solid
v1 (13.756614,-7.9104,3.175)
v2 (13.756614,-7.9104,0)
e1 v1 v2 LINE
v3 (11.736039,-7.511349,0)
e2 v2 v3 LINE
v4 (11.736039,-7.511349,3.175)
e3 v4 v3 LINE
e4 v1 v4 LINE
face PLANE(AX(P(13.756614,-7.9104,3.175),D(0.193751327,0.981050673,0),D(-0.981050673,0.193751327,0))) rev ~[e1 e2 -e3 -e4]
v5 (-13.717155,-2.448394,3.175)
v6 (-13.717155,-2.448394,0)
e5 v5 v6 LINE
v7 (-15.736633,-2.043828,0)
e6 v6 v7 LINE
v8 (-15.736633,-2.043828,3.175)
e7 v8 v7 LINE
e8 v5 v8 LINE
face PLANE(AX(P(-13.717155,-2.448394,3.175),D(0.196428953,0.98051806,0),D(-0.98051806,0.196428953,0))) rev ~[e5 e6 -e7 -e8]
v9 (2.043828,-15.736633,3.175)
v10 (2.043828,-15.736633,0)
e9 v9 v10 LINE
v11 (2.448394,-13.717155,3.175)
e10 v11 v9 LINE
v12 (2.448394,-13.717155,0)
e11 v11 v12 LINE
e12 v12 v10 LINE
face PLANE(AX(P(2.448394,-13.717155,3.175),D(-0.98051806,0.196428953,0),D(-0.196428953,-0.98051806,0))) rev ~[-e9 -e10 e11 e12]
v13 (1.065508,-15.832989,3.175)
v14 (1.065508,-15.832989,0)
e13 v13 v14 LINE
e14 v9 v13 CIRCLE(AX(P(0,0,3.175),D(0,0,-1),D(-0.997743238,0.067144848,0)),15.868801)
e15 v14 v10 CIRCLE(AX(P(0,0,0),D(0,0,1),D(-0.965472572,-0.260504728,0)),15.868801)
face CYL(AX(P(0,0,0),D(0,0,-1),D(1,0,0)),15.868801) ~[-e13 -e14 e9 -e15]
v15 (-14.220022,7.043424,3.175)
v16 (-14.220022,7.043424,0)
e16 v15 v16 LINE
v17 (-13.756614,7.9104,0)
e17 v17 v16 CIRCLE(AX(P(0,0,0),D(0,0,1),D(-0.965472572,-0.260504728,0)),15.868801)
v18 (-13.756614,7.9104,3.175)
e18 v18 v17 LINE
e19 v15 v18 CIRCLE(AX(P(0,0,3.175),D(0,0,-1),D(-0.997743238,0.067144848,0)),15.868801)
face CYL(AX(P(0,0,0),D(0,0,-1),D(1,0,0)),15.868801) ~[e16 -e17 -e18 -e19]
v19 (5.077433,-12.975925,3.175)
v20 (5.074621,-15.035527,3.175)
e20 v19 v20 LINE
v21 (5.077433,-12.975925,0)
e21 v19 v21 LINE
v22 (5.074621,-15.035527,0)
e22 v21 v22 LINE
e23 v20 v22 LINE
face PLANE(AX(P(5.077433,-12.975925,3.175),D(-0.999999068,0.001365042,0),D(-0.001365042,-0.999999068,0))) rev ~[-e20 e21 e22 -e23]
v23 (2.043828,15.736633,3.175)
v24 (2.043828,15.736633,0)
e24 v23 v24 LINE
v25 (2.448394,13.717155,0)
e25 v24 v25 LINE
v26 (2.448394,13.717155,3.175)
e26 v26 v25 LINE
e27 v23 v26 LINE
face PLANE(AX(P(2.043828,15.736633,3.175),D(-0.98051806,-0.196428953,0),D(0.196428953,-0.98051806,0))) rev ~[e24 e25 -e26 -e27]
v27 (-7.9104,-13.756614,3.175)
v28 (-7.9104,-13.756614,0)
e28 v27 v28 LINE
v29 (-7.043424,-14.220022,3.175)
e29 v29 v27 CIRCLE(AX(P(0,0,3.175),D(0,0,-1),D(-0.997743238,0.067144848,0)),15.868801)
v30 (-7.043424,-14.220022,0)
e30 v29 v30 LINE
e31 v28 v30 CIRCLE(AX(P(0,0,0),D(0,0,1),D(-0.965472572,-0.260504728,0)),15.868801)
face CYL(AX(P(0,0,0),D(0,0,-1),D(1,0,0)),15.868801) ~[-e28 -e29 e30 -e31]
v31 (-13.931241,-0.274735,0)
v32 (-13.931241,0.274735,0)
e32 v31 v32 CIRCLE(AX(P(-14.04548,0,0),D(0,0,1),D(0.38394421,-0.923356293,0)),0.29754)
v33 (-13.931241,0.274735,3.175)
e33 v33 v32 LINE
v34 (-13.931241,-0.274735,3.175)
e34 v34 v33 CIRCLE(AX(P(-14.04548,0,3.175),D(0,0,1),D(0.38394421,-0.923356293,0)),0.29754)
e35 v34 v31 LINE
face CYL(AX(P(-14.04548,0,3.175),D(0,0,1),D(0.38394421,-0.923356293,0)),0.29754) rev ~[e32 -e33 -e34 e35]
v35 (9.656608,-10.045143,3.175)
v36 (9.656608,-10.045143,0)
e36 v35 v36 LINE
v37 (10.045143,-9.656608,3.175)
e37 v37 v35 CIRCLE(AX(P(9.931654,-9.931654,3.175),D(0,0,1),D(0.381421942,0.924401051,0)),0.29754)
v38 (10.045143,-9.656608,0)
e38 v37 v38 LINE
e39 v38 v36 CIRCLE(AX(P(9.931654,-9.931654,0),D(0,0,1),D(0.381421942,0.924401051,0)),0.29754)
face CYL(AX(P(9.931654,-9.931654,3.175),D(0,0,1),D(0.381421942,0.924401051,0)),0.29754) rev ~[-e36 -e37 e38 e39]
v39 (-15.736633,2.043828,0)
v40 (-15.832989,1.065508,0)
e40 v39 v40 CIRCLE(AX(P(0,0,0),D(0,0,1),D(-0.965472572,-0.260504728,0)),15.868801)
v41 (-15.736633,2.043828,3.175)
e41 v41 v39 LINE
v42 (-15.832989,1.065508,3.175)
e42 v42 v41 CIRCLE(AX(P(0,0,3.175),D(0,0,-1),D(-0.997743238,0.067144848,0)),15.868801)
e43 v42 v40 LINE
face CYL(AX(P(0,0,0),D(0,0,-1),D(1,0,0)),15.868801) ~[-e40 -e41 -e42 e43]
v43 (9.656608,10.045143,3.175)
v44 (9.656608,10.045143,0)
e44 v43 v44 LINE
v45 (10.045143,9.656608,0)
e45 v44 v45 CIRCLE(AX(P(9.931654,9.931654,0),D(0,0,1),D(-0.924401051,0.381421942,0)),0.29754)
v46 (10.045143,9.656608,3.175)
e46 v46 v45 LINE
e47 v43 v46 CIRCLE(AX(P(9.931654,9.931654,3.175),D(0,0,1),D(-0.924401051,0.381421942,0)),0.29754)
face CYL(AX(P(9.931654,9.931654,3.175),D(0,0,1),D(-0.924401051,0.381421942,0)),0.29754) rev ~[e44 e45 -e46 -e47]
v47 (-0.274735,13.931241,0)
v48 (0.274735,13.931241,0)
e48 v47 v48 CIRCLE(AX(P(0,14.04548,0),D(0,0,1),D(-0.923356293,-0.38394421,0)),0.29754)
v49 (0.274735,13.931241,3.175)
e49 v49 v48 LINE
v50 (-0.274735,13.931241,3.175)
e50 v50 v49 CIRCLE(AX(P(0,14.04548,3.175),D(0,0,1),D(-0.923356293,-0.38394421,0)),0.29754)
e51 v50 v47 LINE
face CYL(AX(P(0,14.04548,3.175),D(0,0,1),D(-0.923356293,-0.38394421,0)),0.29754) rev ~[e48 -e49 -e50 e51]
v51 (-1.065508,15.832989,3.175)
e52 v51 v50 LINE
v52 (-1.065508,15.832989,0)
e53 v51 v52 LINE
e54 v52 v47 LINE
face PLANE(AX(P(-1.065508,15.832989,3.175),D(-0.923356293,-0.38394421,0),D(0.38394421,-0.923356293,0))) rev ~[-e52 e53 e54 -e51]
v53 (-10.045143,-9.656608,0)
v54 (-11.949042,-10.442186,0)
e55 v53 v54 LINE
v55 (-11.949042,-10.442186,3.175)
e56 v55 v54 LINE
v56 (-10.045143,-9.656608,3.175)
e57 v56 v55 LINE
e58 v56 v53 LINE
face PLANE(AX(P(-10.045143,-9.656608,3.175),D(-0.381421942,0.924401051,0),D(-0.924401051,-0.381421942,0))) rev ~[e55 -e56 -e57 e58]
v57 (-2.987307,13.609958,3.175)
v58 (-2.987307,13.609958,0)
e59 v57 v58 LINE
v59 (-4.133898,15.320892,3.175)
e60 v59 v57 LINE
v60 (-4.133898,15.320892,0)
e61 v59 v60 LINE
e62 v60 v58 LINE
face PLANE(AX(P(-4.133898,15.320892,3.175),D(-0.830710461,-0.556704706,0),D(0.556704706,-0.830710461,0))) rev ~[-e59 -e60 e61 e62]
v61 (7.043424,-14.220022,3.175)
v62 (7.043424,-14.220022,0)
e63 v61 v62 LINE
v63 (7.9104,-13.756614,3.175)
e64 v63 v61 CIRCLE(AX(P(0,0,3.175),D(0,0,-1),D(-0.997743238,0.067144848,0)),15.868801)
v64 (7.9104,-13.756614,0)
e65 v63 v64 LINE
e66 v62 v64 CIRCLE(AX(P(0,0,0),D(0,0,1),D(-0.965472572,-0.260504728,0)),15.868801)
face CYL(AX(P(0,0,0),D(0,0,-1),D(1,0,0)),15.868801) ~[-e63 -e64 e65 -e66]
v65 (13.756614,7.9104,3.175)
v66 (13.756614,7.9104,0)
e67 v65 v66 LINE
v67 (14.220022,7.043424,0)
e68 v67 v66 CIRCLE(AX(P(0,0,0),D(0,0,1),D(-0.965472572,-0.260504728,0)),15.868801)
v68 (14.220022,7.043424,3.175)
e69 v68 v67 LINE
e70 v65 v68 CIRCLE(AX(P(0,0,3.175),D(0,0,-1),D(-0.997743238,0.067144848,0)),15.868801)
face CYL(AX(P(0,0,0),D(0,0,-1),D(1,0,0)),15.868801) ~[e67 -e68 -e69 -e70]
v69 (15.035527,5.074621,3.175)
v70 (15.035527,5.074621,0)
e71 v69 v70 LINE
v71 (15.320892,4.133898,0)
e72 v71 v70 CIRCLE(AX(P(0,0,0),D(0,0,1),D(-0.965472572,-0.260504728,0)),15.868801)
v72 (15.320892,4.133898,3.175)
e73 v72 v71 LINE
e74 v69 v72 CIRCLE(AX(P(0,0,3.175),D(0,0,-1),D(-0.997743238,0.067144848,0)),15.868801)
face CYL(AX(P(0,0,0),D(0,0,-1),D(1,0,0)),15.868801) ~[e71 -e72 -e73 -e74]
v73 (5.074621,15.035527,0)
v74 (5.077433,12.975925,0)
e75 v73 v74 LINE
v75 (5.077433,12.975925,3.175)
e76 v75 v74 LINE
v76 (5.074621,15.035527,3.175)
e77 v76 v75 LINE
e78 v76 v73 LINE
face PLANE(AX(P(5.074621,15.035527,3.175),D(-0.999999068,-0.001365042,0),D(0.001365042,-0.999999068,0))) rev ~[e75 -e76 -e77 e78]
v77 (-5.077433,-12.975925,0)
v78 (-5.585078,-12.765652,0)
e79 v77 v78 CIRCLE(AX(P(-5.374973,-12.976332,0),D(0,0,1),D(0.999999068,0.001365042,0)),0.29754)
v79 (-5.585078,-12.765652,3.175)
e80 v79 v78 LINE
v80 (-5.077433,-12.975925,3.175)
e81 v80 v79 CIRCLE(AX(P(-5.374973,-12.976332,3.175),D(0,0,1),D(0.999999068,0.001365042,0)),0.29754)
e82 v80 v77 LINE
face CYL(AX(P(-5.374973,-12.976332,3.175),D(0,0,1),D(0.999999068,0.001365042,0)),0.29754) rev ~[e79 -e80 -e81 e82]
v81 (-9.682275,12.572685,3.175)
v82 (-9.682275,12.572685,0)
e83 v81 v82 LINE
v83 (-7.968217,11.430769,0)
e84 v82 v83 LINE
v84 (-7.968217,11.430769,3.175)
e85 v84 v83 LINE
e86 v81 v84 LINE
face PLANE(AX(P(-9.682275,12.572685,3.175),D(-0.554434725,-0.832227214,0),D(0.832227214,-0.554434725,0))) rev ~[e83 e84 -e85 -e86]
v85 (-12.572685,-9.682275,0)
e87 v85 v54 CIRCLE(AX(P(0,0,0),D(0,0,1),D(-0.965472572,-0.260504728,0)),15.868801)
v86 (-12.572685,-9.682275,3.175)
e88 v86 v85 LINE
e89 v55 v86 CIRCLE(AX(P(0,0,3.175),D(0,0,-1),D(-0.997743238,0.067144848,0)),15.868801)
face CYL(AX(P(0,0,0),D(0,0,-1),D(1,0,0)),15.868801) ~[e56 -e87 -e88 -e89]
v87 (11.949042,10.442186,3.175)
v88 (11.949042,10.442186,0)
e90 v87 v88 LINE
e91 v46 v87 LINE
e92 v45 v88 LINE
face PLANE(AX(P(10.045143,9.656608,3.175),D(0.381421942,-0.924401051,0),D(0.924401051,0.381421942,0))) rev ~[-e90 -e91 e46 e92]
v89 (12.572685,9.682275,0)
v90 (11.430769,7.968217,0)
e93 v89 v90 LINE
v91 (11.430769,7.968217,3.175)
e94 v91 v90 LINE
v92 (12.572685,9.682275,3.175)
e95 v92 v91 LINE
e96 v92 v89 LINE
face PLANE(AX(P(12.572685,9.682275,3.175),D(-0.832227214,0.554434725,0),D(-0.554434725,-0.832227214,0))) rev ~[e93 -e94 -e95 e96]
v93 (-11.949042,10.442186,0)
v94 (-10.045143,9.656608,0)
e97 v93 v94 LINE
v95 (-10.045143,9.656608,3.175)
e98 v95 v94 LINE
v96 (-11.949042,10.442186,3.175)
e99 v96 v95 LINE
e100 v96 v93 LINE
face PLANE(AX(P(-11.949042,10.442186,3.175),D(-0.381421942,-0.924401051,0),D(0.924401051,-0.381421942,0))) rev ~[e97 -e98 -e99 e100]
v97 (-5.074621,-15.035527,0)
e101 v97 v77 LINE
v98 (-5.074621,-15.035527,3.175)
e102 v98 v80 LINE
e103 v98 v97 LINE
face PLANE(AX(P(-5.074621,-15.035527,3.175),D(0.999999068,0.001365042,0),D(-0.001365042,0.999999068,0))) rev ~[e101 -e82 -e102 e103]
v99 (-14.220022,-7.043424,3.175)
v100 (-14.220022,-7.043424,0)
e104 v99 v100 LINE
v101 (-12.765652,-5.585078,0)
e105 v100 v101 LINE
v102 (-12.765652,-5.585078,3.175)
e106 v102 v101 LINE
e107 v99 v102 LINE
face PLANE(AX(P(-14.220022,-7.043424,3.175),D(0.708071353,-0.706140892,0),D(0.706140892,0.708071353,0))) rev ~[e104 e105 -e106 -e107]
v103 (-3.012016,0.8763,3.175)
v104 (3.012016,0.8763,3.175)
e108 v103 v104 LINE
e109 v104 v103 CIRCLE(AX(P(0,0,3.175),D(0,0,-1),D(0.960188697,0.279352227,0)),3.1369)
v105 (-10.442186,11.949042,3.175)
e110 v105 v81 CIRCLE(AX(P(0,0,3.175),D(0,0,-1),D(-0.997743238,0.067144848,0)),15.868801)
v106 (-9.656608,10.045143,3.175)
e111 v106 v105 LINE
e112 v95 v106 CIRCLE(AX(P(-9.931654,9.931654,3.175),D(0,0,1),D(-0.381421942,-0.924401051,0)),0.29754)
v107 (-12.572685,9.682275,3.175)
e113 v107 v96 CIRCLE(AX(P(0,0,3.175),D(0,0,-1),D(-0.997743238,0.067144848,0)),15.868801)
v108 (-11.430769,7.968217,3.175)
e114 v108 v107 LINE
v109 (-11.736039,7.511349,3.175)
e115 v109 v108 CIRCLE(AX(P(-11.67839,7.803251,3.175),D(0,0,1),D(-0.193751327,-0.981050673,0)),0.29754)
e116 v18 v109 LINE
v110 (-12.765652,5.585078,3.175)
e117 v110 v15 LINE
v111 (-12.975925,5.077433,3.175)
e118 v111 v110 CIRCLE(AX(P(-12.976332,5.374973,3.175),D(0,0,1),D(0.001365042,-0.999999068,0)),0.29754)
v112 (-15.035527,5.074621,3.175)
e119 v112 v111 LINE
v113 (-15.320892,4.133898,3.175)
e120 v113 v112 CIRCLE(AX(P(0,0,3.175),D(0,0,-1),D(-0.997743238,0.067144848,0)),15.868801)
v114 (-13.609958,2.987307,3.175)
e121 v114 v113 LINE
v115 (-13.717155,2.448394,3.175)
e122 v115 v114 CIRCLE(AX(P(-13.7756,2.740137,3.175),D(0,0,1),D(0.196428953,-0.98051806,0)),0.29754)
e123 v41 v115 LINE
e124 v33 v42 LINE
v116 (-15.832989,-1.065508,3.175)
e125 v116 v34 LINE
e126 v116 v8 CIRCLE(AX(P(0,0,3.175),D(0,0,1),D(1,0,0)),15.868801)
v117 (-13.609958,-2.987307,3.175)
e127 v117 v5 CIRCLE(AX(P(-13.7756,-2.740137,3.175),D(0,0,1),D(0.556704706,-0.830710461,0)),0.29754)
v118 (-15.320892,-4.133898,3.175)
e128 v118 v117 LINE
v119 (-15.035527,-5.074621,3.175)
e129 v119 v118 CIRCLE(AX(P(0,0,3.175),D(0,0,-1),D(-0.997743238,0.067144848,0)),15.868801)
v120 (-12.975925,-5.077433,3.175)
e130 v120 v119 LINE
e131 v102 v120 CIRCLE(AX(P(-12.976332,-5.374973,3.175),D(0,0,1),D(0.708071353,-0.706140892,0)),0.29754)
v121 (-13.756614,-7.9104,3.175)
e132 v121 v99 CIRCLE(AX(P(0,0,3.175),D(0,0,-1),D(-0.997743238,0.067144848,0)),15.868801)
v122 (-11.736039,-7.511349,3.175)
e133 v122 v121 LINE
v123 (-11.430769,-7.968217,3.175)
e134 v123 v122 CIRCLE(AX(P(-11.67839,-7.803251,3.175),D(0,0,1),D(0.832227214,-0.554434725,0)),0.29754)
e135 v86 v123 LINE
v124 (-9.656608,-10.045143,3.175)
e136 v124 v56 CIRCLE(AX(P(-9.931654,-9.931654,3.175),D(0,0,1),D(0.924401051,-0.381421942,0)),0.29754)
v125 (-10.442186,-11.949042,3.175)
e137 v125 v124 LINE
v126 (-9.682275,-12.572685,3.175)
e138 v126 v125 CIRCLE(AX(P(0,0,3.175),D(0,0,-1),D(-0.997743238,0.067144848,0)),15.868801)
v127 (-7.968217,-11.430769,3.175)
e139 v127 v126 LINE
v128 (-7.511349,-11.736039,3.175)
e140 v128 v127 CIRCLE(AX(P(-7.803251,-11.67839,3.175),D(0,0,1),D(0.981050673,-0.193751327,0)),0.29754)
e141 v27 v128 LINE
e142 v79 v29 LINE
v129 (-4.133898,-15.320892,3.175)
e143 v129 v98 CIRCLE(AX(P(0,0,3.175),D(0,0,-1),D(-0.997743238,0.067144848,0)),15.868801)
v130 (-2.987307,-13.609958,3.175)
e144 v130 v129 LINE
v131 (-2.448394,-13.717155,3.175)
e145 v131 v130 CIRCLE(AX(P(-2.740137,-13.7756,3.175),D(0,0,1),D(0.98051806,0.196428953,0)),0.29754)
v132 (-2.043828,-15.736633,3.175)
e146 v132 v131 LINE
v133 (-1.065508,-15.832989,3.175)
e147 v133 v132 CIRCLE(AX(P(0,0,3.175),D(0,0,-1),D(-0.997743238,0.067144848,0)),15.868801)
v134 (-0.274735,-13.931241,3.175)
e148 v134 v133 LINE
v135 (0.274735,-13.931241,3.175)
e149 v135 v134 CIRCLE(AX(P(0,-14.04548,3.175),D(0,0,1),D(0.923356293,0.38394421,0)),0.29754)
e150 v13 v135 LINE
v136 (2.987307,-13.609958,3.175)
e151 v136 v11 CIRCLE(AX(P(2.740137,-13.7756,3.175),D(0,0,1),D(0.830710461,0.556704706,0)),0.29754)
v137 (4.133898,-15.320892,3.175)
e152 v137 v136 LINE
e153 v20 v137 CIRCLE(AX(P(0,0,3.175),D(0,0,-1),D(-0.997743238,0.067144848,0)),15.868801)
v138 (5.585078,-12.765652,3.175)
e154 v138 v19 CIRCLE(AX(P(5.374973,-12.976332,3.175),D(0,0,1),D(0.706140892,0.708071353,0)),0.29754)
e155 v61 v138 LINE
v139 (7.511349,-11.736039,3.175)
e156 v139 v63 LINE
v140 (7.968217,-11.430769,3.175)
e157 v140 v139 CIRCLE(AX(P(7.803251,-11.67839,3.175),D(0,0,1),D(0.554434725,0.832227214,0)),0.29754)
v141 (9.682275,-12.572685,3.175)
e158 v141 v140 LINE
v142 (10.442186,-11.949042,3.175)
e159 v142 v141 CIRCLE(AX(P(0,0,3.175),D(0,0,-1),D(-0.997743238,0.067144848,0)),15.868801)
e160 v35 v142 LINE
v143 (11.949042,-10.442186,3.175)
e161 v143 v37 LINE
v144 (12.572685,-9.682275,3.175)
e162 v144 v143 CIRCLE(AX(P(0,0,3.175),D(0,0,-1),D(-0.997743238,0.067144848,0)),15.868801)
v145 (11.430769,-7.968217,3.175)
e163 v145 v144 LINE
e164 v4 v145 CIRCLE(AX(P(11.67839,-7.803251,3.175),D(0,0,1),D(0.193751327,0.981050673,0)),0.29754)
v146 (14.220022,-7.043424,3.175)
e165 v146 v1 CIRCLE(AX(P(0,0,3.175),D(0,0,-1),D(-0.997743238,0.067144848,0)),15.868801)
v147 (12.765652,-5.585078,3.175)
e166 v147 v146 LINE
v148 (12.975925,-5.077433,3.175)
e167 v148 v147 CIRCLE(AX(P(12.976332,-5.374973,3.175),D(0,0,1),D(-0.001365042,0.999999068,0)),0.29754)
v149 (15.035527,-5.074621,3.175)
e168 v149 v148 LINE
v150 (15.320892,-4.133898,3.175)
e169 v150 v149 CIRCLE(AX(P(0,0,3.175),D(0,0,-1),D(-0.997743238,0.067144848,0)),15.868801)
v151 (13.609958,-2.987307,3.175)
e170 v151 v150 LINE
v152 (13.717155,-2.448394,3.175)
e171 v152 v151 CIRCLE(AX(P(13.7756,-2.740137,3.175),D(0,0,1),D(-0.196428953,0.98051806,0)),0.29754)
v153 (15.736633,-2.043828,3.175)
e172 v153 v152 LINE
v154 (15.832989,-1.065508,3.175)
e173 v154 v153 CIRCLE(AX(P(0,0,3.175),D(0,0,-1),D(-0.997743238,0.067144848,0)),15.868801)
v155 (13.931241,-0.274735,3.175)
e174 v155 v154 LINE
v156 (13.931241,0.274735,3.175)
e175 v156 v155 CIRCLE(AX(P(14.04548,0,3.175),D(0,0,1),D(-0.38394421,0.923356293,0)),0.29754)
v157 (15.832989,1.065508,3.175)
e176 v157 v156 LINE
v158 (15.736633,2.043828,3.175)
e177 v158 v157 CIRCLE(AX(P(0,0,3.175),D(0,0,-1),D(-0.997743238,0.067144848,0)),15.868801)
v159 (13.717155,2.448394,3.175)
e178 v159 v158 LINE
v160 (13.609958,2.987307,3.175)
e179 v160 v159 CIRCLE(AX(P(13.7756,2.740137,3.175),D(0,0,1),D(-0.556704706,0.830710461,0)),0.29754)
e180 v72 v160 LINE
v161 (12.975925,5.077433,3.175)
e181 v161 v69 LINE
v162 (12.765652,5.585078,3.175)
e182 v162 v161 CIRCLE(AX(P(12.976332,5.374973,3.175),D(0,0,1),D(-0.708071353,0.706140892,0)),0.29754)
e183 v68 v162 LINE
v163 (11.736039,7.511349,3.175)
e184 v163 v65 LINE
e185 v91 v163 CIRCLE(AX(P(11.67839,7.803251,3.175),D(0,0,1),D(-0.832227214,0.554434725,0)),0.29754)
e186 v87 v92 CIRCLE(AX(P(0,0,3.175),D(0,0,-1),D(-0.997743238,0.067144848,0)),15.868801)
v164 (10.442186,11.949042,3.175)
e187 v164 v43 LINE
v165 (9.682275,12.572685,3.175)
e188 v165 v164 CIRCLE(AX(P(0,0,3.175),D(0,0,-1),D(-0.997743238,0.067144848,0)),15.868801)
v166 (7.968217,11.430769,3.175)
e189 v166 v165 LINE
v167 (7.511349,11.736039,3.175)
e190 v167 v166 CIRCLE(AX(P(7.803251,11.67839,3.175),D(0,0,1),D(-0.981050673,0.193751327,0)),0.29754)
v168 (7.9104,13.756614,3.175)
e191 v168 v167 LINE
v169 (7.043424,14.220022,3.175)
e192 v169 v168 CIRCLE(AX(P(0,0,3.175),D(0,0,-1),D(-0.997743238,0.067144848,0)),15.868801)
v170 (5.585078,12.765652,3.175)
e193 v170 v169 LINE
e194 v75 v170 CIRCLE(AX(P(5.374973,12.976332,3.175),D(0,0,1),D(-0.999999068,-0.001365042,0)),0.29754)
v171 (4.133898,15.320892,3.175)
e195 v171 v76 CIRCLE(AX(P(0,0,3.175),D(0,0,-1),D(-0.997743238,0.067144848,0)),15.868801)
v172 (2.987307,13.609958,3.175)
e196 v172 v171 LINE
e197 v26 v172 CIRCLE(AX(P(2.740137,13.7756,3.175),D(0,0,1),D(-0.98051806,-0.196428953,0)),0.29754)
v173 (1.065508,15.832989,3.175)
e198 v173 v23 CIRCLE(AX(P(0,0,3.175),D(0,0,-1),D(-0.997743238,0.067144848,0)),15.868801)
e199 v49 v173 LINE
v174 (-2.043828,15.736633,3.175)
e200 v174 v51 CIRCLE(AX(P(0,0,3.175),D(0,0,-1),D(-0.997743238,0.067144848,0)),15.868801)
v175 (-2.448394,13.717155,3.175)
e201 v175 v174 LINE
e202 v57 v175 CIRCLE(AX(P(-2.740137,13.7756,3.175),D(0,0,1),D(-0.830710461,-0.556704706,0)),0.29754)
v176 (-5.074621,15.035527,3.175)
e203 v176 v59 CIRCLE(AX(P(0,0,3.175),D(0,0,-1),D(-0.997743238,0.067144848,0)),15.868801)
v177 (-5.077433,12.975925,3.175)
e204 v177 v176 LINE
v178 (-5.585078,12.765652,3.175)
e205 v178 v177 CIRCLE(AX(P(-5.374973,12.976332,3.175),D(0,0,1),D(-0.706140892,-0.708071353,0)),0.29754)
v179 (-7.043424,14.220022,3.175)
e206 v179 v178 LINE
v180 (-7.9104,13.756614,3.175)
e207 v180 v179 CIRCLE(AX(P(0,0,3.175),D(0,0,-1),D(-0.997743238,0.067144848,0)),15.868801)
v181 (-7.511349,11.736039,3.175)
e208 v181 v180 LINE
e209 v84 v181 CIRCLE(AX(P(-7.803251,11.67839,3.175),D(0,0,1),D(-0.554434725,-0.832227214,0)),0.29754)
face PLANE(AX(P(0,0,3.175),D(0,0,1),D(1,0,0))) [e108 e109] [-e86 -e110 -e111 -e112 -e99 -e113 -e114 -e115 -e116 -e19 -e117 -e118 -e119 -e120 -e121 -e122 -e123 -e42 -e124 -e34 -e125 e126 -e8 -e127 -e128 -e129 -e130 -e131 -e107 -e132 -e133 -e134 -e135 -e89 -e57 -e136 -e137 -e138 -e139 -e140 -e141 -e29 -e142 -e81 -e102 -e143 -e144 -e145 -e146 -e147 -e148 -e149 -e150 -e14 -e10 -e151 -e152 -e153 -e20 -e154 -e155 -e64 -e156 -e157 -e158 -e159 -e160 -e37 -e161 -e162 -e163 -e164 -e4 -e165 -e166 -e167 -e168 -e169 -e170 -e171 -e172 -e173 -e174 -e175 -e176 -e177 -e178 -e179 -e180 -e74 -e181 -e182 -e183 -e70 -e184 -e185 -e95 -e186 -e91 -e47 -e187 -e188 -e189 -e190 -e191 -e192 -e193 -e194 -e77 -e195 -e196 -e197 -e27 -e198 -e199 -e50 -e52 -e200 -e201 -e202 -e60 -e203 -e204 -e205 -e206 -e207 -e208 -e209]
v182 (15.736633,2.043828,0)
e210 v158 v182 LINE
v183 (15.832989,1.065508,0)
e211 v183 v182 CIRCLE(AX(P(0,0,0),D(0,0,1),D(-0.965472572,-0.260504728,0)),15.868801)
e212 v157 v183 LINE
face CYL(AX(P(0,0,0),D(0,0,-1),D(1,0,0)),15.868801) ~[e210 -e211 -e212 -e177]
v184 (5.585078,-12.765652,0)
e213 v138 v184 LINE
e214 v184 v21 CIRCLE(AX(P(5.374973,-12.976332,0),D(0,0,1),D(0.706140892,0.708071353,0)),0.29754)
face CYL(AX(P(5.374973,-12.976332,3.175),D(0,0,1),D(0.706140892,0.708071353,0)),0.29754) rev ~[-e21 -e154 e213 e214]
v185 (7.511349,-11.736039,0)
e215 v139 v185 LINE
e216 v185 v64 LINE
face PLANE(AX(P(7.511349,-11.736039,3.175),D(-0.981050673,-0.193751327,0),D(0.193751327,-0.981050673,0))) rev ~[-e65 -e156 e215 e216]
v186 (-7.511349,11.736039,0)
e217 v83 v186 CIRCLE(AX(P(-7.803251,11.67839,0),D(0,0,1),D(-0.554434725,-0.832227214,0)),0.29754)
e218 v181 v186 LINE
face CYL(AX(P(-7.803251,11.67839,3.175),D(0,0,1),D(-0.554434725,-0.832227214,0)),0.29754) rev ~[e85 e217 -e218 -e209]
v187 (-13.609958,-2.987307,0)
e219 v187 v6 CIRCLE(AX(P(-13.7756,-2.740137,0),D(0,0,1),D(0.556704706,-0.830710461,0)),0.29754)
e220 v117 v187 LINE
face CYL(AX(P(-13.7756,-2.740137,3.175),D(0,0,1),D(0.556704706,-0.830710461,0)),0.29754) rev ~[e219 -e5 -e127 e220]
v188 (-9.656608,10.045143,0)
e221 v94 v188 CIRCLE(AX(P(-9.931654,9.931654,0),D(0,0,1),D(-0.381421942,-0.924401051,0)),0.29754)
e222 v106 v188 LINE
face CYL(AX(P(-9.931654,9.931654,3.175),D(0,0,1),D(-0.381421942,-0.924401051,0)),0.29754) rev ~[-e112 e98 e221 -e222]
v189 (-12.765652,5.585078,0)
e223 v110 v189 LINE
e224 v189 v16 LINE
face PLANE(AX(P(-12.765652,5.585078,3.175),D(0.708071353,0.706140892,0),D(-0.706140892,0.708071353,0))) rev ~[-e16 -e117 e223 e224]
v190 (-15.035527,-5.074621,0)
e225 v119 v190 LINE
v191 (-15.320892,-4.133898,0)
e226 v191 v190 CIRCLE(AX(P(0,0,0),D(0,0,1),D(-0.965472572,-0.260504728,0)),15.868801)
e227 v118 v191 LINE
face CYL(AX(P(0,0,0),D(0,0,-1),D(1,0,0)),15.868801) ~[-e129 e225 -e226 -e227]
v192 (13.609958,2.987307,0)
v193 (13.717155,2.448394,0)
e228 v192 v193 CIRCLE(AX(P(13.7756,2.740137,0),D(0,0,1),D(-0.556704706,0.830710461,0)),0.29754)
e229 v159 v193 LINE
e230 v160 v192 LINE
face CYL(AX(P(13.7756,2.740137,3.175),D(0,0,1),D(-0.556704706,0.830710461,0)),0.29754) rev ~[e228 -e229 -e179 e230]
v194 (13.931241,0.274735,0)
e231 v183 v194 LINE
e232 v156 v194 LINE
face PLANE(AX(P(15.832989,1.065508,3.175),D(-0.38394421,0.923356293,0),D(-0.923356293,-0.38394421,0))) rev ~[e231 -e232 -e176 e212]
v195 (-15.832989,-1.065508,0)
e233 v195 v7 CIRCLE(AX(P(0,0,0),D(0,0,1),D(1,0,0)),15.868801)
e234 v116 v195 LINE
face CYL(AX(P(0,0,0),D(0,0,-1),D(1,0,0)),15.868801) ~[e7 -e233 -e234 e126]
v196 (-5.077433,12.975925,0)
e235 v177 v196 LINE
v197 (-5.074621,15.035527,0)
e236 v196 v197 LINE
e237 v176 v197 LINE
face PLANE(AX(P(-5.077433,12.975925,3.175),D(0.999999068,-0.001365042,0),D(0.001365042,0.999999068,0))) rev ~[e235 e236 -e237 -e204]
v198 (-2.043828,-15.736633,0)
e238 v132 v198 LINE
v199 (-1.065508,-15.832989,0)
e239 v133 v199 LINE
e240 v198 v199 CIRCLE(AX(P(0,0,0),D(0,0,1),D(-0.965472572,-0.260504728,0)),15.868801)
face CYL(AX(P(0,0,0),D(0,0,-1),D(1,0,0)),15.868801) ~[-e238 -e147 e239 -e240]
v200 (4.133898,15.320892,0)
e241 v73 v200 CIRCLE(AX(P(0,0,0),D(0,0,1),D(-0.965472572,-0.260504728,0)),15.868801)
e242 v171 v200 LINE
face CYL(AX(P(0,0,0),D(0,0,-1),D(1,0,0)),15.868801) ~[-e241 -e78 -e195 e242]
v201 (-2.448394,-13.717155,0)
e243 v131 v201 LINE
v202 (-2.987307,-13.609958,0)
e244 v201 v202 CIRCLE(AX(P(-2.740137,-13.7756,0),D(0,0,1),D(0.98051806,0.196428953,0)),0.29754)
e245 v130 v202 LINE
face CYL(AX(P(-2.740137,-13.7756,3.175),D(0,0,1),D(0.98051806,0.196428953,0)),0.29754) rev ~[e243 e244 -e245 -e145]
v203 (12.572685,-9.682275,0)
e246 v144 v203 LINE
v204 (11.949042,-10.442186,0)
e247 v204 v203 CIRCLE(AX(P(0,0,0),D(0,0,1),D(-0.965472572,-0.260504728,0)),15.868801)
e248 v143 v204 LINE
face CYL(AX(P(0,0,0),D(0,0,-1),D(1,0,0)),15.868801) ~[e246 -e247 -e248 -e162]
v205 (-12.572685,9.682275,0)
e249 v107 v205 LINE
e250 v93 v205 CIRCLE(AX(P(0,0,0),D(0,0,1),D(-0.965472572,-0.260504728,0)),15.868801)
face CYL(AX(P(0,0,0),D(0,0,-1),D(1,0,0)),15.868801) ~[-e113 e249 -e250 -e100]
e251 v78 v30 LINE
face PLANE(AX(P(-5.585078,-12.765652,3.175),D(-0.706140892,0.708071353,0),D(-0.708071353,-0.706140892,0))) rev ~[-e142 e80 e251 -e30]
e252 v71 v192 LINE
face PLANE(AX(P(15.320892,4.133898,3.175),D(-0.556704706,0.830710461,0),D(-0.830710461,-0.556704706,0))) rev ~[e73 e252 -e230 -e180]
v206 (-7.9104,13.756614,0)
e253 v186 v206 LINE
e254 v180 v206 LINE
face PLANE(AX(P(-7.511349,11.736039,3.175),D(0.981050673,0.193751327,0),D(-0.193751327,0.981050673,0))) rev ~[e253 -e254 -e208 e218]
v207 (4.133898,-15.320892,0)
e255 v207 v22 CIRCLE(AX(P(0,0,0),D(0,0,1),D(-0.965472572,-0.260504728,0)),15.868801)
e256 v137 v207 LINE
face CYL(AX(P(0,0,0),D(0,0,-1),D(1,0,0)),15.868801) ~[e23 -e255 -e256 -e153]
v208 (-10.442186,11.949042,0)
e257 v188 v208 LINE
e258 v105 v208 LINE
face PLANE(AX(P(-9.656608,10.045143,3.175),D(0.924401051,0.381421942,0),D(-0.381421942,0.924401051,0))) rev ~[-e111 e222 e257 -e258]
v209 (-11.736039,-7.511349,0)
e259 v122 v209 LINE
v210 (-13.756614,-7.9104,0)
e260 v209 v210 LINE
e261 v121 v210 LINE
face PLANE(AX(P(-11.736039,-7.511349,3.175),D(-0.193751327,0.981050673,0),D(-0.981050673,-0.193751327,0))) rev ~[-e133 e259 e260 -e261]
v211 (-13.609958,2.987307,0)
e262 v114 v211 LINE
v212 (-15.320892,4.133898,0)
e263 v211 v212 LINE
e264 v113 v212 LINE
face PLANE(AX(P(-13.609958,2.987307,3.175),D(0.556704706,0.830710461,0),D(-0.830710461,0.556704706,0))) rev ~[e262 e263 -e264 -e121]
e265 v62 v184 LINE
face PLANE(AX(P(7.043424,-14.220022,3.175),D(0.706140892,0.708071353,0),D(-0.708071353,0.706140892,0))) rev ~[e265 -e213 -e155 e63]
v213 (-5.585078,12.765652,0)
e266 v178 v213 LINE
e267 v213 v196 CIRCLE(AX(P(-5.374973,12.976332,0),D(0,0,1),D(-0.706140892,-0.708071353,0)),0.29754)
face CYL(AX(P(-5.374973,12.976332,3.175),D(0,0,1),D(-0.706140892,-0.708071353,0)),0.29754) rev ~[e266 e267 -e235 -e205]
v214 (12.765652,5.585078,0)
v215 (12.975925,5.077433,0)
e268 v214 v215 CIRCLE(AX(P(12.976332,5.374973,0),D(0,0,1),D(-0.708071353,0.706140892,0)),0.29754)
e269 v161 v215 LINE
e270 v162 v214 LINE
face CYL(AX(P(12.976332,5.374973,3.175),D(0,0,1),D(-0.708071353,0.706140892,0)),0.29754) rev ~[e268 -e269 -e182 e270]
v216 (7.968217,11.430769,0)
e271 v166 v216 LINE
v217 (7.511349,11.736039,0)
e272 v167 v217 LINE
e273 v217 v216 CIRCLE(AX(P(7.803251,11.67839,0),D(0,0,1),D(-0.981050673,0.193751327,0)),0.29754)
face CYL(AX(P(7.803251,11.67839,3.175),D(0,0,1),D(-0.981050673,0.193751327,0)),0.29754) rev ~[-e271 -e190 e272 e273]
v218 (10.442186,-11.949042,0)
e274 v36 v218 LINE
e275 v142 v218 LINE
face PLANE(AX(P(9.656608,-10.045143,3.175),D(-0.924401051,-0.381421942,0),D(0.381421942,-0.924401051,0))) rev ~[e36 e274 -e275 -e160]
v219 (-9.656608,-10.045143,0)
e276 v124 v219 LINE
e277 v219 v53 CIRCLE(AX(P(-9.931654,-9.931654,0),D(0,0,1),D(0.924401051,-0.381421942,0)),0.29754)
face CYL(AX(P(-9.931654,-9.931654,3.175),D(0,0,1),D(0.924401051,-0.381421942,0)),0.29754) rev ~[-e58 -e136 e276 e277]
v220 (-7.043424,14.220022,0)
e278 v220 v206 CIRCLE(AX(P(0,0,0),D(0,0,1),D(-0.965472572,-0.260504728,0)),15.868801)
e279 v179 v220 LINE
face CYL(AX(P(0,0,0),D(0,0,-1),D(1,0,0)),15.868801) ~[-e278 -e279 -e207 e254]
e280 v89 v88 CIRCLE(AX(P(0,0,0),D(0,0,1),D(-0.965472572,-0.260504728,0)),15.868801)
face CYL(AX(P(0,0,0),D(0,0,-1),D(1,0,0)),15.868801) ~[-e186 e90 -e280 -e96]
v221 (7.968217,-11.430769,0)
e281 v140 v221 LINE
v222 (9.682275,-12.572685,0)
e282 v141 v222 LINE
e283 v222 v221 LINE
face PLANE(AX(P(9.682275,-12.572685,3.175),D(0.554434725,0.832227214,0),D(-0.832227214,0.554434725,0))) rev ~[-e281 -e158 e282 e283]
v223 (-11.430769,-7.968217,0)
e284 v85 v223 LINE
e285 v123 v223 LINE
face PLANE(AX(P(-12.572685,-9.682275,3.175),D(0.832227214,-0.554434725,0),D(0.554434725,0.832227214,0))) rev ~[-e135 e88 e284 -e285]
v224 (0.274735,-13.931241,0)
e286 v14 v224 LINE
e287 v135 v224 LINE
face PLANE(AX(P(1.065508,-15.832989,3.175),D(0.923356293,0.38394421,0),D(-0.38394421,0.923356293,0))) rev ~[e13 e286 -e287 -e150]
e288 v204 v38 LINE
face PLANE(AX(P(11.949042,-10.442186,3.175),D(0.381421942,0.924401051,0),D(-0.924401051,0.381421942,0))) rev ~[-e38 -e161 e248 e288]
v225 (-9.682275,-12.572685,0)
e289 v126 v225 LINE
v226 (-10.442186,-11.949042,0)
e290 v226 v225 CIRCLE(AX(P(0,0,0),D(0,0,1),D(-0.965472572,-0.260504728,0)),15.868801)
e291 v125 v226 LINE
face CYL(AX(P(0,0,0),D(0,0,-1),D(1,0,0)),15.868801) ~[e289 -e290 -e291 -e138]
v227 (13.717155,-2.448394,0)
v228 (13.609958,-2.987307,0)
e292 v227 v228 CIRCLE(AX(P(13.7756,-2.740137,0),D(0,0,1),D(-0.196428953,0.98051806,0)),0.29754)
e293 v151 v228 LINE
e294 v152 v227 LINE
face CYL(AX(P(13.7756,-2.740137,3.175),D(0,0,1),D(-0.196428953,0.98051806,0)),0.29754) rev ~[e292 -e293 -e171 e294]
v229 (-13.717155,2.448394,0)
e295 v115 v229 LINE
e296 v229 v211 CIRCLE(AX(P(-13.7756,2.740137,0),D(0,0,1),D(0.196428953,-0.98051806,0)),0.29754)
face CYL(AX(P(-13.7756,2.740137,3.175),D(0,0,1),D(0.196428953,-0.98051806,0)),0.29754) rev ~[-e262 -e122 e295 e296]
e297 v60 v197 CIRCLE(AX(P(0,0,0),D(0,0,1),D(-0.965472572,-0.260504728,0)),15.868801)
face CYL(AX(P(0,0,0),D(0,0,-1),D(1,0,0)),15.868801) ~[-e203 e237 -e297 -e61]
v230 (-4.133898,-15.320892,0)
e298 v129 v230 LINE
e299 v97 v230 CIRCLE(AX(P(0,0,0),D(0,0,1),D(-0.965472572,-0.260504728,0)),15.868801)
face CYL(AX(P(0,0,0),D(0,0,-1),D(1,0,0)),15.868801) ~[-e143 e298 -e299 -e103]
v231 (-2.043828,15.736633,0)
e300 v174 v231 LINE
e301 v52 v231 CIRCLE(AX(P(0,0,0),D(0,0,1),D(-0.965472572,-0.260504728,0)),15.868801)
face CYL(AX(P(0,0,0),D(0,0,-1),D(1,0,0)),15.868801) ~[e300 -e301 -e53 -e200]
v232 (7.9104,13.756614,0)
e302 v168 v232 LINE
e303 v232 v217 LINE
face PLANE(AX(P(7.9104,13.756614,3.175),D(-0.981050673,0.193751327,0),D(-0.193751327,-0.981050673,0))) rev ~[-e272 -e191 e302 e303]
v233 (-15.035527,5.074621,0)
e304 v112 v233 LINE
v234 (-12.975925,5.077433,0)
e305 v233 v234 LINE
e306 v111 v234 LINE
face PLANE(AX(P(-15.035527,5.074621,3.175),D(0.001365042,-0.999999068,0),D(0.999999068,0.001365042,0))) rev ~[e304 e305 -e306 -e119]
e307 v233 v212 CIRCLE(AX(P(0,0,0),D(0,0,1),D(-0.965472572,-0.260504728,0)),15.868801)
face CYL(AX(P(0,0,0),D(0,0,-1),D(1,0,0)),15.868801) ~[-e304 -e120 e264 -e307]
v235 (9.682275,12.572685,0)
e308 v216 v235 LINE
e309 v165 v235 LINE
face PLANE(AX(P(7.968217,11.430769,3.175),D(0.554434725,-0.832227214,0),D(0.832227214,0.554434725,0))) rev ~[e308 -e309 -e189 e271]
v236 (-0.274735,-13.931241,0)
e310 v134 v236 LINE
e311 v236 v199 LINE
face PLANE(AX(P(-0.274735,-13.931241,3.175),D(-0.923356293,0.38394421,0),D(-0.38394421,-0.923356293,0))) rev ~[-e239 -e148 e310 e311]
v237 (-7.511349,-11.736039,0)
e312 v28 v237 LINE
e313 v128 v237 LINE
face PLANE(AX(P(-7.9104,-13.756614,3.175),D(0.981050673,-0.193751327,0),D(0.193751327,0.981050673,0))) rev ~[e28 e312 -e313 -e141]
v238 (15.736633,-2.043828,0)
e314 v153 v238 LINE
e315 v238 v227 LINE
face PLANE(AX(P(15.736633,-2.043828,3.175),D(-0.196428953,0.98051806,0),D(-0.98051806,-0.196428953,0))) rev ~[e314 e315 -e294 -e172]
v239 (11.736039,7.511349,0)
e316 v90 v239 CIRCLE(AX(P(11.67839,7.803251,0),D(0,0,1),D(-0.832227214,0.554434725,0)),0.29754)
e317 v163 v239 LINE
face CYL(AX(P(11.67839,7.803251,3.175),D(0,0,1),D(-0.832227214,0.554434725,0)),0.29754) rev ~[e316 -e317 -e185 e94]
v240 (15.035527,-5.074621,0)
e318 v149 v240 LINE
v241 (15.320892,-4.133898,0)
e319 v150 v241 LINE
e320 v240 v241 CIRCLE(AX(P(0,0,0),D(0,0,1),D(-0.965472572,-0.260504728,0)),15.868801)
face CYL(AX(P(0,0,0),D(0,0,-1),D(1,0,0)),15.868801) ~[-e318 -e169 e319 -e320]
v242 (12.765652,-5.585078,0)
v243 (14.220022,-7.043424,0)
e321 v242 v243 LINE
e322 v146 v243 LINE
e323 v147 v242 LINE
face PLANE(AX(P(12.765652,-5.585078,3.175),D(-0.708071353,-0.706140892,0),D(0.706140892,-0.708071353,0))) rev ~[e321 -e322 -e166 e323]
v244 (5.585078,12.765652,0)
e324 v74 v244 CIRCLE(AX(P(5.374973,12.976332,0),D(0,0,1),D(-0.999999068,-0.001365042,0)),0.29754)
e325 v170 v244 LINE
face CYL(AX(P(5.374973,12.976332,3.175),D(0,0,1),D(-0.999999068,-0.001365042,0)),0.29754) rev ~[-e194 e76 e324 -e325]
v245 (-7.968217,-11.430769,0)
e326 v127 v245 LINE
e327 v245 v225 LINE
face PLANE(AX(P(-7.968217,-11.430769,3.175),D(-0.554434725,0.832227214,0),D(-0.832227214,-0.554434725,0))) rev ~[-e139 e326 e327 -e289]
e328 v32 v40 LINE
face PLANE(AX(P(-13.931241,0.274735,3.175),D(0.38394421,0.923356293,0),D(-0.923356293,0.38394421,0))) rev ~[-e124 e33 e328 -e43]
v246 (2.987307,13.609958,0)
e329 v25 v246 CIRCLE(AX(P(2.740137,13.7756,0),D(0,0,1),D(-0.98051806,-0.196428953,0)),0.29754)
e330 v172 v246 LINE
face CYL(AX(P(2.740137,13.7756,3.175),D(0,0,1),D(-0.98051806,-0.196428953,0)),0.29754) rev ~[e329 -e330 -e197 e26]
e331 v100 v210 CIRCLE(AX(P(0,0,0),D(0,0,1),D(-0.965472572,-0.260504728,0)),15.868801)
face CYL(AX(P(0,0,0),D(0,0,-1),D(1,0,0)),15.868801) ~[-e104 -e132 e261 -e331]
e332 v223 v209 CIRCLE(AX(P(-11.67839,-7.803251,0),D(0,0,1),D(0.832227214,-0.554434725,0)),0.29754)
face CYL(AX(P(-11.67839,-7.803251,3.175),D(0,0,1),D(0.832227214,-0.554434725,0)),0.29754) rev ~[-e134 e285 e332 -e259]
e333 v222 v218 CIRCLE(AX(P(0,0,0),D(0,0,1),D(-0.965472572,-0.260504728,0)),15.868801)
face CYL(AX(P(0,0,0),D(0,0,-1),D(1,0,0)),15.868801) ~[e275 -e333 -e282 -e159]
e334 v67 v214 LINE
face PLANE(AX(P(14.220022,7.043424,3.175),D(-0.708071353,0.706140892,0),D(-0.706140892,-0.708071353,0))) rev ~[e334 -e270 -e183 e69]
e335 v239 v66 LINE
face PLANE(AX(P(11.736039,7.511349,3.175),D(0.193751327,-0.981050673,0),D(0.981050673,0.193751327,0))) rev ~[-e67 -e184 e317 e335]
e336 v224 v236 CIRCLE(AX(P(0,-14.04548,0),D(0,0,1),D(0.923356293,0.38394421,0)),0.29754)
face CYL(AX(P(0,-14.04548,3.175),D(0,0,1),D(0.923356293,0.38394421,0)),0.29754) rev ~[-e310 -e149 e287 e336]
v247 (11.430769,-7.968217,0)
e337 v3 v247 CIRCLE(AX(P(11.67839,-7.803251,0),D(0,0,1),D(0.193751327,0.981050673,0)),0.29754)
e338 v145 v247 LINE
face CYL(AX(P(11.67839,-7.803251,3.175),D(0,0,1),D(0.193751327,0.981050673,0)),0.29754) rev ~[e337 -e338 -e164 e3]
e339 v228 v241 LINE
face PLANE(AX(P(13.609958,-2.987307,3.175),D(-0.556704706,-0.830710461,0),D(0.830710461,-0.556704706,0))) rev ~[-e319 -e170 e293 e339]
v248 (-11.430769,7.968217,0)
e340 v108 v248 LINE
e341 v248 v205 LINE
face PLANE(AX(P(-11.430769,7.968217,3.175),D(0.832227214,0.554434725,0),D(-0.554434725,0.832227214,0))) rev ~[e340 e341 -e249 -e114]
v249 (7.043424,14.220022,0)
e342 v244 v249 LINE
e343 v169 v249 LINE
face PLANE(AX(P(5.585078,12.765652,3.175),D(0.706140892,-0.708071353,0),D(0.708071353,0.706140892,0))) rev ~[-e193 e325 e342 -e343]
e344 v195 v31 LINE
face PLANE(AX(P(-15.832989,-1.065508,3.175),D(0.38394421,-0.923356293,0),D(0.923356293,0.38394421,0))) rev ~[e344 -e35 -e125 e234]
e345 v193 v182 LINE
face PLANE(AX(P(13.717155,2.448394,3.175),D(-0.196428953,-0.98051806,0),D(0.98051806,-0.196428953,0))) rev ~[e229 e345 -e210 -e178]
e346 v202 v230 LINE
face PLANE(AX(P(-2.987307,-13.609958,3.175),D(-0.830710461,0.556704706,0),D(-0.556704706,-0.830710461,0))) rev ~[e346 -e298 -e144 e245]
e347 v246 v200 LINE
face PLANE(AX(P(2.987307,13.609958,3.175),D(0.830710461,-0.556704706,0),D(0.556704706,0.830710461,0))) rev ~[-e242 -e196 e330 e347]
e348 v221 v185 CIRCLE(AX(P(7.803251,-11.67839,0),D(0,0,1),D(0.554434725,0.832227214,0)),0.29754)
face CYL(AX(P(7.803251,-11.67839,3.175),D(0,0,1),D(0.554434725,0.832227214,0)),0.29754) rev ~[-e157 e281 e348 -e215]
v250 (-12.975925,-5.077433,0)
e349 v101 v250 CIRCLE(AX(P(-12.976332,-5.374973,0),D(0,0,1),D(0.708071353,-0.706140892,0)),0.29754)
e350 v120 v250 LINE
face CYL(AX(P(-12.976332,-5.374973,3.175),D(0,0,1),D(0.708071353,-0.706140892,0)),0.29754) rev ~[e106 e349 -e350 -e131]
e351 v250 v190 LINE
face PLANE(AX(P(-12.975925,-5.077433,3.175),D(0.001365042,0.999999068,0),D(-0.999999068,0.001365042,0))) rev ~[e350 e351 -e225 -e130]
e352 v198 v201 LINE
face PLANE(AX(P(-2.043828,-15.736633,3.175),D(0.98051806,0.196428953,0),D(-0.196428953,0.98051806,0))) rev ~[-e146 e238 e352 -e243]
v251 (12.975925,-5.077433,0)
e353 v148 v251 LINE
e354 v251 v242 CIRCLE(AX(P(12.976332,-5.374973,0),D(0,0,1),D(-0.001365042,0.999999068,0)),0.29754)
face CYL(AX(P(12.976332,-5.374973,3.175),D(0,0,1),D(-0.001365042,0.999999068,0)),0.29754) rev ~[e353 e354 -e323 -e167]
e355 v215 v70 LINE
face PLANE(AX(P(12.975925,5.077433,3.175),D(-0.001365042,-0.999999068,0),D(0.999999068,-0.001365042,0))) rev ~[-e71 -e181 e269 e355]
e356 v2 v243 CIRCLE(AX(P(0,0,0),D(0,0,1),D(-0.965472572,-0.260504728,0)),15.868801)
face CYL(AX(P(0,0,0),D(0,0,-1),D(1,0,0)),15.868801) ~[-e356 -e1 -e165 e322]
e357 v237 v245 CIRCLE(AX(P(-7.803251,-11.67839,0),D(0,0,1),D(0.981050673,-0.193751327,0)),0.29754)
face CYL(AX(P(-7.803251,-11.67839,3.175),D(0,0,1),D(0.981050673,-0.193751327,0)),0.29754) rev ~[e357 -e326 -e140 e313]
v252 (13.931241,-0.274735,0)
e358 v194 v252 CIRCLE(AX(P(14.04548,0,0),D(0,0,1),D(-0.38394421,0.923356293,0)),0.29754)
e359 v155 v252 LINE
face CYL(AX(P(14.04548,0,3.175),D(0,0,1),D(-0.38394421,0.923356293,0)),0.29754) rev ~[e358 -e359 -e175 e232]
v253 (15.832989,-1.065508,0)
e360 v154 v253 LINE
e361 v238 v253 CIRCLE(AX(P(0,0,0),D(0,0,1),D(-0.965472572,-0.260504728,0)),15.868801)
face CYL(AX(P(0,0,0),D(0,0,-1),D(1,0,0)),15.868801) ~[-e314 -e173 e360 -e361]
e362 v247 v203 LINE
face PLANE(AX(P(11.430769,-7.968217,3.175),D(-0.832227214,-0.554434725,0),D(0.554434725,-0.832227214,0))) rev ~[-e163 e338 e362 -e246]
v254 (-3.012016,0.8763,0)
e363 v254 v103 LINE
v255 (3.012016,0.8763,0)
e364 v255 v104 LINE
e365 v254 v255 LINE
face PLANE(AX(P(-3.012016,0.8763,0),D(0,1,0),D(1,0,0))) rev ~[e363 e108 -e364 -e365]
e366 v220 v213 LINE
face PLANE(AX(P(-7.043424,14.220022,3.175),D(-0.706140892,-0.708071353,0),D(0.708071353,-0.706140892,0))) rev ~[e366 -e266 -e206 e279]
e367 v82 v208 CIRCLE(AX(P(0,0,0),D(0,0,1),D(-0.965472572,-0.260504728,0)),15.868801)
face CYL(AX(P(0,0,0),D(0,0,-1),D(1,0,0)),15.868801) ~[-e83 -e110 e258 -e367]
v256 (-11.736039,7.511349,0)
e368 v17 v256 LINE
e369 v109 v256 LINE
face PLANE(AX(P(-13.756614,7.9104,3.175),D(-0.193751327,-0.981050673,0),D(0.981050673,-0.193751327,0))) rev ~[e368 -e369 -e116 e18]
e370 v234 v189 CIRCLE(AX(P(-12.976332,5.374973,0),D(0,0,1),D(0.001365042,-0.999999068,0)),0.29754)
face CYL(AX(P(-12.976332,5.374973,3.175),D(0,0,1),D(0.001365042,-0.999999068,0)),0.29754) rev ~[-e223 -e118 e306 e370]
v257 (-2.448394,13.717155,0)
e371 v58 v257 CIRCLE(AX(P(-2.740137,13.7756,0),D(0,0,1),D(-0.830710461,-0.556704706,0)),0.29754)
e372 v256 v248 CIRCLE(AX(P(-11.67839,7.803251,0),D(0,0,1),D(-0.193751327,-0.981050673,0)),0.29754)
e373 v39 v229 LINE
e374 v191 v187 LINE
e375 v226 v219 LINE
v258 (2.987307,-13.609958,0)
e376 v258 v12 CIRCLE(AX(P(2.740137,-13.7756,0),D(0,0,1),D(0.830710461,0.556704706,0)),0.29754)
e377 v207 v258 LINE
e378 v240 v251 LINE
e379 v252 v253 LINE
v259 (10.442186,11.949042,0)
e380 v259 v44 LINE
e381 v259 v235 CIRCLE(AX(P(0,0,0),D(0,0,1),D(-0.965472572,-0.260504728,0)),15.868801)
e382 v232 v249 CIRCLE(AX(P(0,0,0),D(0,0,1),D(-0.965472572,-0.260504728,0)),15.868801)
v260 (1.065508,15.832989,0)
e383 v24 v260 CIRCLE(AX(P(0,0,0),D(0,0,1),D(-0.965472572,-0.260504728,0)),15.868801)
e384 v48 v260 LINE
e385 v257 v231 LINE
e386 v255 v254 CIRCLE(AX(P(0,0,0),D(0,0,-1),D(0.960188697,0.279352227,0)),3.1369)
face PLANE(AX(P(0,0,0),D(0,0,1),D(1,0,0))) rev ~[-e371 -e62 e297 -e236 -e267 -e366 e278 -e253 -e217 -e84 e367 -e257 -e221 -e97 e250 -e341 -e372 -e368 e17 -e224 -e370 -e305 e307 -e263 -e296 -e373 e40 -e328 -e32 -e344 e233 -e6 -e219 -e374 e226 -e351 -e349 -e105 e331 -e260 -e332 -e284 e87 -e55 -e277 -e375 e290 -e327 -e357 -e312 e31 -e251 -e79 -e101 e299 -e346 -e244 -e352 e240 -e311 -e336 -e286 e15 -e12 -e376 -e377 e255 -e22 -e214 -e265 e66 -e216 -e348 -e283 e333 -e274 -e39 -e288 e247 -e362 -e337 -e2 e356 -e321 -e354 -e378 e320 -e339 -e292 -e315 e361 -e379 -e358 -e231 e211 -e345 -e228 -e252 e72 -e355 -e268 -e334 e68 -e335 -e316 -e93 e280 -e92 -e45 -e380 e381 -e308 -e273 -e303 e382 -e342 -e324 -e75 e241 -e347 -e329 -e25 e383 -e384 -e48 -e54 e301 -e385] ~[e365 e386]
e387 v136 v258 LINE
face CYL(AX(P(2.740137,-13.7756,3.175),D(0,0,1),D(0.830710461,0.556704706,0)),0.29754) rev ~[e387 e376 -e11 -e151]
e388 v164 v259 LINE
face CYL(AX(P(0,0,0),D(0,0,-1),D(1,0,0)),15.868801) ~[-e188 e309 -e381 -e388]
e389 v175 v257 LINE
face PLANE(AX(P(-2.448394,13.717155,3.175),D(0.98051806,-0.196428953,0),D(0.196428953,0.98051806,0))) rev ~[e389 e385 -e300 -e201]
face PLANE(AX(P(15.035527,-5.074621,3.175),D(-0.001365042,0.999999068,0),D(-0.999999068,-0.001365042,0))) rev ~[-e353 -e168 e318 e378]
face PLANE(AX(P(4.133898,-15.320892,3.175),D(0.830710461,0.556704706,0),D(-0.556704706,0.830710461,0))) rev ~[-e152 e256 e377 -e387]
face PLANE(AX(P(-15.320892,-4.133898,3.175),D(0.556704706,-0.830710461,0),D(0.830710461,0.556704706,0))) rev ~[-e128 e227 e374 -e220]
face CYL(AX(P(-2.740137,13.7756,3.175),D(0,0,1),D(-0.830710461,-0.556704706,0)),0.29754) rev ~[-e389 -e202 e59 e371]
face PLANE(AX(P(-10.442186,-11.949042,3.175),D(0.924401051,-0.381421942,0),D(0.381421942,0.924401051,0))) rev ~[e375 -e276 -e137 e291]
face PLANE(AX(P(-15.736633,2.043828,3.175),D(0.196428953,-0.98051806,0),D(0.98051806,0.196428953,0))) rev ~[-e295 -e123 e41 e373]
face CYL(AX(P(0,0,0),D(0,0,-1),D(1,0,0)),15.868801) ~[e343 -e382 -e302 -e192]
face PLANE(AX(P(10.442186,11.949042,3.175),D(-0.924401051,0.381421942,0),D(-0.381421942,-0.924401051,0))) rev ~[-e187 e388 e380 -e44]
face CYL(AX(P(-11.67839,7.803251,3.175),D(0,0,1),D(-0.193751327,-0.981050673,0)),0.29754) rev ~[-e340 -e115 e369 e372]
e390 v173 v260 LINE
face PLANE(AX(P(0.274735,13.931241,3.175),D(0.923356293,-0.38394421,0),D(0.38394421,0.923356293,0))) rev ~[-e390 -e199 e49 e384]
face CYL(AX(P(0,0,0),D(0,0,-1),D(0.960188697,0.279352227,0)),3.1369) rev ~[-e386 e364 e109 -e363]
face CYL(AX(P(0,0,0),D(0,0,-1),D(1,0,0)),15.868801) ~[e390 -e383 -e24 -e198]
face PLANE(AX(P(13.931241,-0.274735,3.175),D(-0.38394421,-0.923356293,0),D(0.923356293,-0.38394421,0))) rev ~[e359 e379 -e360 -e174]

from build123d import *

# Parameters (mm, degrees)
F0_R            = 15.8688012495
F1_DEPTH        = 3.175
F3_DEPTH        = 3.175
F3_COPIES_COUNT = 32


# Not quite as in the source:
# - a pattern or mirror of a feature is missing from the dataset's text; its kind, count and spacing are read off the source's solid


with BuildPart() as f1:
    # F0 (on Top) → F1 (new body)
    with BuildSketch(Plane.XY):
        Circle(F0_R)
        with BuildLine():
            ThreePointArc((3.0120159229, 0.8763), (0, -3.1369), (-3.0120159229, 0.8763))
            Line((-3.0120159229, 0.8763), (3.0120159229, 0.8763))
        make_face(mode=Mode.SUBTRACT)
    extrude(amount=F1_DEPTH)

    # F2 (on face) → F3 (cut, through all)
    with BuildSketch(Plane.XY.offset(3.175)):
        with BuildLine():
            Line((-13.9312413972, 0.274735453), (-15.8329891451, 1.065508248))
            ThreePointArc((-15.8329891451, 1.065508248), (-15.8688012495, 0), (-15.8329891451, -1.065508248))
            Line((-15.8329891451, -1.065508248), (-13.9312413972, -0.274735453))
            ThreePointArc((-13.9312413972, -0.274735453), (-13.747940143, 0), (-13.9312413972, 0.274735453))
        make_face()
    f3 = extrude(amount=-F3_DEPTH, mode=Mode.SUBTRACT)

    # F3_copies: F3 ×32 about axis
    f3_copies_axis = Axis((0, 0, 0), (0, 0, 1))
    for i in range(1, F3_COPIES_COUNT):
        add(f3.rotate(f3_copies_axis, i * 360 / F3_COPIES_COUNT), mode=Mode.SUBTRACT)


solid = f1.part
